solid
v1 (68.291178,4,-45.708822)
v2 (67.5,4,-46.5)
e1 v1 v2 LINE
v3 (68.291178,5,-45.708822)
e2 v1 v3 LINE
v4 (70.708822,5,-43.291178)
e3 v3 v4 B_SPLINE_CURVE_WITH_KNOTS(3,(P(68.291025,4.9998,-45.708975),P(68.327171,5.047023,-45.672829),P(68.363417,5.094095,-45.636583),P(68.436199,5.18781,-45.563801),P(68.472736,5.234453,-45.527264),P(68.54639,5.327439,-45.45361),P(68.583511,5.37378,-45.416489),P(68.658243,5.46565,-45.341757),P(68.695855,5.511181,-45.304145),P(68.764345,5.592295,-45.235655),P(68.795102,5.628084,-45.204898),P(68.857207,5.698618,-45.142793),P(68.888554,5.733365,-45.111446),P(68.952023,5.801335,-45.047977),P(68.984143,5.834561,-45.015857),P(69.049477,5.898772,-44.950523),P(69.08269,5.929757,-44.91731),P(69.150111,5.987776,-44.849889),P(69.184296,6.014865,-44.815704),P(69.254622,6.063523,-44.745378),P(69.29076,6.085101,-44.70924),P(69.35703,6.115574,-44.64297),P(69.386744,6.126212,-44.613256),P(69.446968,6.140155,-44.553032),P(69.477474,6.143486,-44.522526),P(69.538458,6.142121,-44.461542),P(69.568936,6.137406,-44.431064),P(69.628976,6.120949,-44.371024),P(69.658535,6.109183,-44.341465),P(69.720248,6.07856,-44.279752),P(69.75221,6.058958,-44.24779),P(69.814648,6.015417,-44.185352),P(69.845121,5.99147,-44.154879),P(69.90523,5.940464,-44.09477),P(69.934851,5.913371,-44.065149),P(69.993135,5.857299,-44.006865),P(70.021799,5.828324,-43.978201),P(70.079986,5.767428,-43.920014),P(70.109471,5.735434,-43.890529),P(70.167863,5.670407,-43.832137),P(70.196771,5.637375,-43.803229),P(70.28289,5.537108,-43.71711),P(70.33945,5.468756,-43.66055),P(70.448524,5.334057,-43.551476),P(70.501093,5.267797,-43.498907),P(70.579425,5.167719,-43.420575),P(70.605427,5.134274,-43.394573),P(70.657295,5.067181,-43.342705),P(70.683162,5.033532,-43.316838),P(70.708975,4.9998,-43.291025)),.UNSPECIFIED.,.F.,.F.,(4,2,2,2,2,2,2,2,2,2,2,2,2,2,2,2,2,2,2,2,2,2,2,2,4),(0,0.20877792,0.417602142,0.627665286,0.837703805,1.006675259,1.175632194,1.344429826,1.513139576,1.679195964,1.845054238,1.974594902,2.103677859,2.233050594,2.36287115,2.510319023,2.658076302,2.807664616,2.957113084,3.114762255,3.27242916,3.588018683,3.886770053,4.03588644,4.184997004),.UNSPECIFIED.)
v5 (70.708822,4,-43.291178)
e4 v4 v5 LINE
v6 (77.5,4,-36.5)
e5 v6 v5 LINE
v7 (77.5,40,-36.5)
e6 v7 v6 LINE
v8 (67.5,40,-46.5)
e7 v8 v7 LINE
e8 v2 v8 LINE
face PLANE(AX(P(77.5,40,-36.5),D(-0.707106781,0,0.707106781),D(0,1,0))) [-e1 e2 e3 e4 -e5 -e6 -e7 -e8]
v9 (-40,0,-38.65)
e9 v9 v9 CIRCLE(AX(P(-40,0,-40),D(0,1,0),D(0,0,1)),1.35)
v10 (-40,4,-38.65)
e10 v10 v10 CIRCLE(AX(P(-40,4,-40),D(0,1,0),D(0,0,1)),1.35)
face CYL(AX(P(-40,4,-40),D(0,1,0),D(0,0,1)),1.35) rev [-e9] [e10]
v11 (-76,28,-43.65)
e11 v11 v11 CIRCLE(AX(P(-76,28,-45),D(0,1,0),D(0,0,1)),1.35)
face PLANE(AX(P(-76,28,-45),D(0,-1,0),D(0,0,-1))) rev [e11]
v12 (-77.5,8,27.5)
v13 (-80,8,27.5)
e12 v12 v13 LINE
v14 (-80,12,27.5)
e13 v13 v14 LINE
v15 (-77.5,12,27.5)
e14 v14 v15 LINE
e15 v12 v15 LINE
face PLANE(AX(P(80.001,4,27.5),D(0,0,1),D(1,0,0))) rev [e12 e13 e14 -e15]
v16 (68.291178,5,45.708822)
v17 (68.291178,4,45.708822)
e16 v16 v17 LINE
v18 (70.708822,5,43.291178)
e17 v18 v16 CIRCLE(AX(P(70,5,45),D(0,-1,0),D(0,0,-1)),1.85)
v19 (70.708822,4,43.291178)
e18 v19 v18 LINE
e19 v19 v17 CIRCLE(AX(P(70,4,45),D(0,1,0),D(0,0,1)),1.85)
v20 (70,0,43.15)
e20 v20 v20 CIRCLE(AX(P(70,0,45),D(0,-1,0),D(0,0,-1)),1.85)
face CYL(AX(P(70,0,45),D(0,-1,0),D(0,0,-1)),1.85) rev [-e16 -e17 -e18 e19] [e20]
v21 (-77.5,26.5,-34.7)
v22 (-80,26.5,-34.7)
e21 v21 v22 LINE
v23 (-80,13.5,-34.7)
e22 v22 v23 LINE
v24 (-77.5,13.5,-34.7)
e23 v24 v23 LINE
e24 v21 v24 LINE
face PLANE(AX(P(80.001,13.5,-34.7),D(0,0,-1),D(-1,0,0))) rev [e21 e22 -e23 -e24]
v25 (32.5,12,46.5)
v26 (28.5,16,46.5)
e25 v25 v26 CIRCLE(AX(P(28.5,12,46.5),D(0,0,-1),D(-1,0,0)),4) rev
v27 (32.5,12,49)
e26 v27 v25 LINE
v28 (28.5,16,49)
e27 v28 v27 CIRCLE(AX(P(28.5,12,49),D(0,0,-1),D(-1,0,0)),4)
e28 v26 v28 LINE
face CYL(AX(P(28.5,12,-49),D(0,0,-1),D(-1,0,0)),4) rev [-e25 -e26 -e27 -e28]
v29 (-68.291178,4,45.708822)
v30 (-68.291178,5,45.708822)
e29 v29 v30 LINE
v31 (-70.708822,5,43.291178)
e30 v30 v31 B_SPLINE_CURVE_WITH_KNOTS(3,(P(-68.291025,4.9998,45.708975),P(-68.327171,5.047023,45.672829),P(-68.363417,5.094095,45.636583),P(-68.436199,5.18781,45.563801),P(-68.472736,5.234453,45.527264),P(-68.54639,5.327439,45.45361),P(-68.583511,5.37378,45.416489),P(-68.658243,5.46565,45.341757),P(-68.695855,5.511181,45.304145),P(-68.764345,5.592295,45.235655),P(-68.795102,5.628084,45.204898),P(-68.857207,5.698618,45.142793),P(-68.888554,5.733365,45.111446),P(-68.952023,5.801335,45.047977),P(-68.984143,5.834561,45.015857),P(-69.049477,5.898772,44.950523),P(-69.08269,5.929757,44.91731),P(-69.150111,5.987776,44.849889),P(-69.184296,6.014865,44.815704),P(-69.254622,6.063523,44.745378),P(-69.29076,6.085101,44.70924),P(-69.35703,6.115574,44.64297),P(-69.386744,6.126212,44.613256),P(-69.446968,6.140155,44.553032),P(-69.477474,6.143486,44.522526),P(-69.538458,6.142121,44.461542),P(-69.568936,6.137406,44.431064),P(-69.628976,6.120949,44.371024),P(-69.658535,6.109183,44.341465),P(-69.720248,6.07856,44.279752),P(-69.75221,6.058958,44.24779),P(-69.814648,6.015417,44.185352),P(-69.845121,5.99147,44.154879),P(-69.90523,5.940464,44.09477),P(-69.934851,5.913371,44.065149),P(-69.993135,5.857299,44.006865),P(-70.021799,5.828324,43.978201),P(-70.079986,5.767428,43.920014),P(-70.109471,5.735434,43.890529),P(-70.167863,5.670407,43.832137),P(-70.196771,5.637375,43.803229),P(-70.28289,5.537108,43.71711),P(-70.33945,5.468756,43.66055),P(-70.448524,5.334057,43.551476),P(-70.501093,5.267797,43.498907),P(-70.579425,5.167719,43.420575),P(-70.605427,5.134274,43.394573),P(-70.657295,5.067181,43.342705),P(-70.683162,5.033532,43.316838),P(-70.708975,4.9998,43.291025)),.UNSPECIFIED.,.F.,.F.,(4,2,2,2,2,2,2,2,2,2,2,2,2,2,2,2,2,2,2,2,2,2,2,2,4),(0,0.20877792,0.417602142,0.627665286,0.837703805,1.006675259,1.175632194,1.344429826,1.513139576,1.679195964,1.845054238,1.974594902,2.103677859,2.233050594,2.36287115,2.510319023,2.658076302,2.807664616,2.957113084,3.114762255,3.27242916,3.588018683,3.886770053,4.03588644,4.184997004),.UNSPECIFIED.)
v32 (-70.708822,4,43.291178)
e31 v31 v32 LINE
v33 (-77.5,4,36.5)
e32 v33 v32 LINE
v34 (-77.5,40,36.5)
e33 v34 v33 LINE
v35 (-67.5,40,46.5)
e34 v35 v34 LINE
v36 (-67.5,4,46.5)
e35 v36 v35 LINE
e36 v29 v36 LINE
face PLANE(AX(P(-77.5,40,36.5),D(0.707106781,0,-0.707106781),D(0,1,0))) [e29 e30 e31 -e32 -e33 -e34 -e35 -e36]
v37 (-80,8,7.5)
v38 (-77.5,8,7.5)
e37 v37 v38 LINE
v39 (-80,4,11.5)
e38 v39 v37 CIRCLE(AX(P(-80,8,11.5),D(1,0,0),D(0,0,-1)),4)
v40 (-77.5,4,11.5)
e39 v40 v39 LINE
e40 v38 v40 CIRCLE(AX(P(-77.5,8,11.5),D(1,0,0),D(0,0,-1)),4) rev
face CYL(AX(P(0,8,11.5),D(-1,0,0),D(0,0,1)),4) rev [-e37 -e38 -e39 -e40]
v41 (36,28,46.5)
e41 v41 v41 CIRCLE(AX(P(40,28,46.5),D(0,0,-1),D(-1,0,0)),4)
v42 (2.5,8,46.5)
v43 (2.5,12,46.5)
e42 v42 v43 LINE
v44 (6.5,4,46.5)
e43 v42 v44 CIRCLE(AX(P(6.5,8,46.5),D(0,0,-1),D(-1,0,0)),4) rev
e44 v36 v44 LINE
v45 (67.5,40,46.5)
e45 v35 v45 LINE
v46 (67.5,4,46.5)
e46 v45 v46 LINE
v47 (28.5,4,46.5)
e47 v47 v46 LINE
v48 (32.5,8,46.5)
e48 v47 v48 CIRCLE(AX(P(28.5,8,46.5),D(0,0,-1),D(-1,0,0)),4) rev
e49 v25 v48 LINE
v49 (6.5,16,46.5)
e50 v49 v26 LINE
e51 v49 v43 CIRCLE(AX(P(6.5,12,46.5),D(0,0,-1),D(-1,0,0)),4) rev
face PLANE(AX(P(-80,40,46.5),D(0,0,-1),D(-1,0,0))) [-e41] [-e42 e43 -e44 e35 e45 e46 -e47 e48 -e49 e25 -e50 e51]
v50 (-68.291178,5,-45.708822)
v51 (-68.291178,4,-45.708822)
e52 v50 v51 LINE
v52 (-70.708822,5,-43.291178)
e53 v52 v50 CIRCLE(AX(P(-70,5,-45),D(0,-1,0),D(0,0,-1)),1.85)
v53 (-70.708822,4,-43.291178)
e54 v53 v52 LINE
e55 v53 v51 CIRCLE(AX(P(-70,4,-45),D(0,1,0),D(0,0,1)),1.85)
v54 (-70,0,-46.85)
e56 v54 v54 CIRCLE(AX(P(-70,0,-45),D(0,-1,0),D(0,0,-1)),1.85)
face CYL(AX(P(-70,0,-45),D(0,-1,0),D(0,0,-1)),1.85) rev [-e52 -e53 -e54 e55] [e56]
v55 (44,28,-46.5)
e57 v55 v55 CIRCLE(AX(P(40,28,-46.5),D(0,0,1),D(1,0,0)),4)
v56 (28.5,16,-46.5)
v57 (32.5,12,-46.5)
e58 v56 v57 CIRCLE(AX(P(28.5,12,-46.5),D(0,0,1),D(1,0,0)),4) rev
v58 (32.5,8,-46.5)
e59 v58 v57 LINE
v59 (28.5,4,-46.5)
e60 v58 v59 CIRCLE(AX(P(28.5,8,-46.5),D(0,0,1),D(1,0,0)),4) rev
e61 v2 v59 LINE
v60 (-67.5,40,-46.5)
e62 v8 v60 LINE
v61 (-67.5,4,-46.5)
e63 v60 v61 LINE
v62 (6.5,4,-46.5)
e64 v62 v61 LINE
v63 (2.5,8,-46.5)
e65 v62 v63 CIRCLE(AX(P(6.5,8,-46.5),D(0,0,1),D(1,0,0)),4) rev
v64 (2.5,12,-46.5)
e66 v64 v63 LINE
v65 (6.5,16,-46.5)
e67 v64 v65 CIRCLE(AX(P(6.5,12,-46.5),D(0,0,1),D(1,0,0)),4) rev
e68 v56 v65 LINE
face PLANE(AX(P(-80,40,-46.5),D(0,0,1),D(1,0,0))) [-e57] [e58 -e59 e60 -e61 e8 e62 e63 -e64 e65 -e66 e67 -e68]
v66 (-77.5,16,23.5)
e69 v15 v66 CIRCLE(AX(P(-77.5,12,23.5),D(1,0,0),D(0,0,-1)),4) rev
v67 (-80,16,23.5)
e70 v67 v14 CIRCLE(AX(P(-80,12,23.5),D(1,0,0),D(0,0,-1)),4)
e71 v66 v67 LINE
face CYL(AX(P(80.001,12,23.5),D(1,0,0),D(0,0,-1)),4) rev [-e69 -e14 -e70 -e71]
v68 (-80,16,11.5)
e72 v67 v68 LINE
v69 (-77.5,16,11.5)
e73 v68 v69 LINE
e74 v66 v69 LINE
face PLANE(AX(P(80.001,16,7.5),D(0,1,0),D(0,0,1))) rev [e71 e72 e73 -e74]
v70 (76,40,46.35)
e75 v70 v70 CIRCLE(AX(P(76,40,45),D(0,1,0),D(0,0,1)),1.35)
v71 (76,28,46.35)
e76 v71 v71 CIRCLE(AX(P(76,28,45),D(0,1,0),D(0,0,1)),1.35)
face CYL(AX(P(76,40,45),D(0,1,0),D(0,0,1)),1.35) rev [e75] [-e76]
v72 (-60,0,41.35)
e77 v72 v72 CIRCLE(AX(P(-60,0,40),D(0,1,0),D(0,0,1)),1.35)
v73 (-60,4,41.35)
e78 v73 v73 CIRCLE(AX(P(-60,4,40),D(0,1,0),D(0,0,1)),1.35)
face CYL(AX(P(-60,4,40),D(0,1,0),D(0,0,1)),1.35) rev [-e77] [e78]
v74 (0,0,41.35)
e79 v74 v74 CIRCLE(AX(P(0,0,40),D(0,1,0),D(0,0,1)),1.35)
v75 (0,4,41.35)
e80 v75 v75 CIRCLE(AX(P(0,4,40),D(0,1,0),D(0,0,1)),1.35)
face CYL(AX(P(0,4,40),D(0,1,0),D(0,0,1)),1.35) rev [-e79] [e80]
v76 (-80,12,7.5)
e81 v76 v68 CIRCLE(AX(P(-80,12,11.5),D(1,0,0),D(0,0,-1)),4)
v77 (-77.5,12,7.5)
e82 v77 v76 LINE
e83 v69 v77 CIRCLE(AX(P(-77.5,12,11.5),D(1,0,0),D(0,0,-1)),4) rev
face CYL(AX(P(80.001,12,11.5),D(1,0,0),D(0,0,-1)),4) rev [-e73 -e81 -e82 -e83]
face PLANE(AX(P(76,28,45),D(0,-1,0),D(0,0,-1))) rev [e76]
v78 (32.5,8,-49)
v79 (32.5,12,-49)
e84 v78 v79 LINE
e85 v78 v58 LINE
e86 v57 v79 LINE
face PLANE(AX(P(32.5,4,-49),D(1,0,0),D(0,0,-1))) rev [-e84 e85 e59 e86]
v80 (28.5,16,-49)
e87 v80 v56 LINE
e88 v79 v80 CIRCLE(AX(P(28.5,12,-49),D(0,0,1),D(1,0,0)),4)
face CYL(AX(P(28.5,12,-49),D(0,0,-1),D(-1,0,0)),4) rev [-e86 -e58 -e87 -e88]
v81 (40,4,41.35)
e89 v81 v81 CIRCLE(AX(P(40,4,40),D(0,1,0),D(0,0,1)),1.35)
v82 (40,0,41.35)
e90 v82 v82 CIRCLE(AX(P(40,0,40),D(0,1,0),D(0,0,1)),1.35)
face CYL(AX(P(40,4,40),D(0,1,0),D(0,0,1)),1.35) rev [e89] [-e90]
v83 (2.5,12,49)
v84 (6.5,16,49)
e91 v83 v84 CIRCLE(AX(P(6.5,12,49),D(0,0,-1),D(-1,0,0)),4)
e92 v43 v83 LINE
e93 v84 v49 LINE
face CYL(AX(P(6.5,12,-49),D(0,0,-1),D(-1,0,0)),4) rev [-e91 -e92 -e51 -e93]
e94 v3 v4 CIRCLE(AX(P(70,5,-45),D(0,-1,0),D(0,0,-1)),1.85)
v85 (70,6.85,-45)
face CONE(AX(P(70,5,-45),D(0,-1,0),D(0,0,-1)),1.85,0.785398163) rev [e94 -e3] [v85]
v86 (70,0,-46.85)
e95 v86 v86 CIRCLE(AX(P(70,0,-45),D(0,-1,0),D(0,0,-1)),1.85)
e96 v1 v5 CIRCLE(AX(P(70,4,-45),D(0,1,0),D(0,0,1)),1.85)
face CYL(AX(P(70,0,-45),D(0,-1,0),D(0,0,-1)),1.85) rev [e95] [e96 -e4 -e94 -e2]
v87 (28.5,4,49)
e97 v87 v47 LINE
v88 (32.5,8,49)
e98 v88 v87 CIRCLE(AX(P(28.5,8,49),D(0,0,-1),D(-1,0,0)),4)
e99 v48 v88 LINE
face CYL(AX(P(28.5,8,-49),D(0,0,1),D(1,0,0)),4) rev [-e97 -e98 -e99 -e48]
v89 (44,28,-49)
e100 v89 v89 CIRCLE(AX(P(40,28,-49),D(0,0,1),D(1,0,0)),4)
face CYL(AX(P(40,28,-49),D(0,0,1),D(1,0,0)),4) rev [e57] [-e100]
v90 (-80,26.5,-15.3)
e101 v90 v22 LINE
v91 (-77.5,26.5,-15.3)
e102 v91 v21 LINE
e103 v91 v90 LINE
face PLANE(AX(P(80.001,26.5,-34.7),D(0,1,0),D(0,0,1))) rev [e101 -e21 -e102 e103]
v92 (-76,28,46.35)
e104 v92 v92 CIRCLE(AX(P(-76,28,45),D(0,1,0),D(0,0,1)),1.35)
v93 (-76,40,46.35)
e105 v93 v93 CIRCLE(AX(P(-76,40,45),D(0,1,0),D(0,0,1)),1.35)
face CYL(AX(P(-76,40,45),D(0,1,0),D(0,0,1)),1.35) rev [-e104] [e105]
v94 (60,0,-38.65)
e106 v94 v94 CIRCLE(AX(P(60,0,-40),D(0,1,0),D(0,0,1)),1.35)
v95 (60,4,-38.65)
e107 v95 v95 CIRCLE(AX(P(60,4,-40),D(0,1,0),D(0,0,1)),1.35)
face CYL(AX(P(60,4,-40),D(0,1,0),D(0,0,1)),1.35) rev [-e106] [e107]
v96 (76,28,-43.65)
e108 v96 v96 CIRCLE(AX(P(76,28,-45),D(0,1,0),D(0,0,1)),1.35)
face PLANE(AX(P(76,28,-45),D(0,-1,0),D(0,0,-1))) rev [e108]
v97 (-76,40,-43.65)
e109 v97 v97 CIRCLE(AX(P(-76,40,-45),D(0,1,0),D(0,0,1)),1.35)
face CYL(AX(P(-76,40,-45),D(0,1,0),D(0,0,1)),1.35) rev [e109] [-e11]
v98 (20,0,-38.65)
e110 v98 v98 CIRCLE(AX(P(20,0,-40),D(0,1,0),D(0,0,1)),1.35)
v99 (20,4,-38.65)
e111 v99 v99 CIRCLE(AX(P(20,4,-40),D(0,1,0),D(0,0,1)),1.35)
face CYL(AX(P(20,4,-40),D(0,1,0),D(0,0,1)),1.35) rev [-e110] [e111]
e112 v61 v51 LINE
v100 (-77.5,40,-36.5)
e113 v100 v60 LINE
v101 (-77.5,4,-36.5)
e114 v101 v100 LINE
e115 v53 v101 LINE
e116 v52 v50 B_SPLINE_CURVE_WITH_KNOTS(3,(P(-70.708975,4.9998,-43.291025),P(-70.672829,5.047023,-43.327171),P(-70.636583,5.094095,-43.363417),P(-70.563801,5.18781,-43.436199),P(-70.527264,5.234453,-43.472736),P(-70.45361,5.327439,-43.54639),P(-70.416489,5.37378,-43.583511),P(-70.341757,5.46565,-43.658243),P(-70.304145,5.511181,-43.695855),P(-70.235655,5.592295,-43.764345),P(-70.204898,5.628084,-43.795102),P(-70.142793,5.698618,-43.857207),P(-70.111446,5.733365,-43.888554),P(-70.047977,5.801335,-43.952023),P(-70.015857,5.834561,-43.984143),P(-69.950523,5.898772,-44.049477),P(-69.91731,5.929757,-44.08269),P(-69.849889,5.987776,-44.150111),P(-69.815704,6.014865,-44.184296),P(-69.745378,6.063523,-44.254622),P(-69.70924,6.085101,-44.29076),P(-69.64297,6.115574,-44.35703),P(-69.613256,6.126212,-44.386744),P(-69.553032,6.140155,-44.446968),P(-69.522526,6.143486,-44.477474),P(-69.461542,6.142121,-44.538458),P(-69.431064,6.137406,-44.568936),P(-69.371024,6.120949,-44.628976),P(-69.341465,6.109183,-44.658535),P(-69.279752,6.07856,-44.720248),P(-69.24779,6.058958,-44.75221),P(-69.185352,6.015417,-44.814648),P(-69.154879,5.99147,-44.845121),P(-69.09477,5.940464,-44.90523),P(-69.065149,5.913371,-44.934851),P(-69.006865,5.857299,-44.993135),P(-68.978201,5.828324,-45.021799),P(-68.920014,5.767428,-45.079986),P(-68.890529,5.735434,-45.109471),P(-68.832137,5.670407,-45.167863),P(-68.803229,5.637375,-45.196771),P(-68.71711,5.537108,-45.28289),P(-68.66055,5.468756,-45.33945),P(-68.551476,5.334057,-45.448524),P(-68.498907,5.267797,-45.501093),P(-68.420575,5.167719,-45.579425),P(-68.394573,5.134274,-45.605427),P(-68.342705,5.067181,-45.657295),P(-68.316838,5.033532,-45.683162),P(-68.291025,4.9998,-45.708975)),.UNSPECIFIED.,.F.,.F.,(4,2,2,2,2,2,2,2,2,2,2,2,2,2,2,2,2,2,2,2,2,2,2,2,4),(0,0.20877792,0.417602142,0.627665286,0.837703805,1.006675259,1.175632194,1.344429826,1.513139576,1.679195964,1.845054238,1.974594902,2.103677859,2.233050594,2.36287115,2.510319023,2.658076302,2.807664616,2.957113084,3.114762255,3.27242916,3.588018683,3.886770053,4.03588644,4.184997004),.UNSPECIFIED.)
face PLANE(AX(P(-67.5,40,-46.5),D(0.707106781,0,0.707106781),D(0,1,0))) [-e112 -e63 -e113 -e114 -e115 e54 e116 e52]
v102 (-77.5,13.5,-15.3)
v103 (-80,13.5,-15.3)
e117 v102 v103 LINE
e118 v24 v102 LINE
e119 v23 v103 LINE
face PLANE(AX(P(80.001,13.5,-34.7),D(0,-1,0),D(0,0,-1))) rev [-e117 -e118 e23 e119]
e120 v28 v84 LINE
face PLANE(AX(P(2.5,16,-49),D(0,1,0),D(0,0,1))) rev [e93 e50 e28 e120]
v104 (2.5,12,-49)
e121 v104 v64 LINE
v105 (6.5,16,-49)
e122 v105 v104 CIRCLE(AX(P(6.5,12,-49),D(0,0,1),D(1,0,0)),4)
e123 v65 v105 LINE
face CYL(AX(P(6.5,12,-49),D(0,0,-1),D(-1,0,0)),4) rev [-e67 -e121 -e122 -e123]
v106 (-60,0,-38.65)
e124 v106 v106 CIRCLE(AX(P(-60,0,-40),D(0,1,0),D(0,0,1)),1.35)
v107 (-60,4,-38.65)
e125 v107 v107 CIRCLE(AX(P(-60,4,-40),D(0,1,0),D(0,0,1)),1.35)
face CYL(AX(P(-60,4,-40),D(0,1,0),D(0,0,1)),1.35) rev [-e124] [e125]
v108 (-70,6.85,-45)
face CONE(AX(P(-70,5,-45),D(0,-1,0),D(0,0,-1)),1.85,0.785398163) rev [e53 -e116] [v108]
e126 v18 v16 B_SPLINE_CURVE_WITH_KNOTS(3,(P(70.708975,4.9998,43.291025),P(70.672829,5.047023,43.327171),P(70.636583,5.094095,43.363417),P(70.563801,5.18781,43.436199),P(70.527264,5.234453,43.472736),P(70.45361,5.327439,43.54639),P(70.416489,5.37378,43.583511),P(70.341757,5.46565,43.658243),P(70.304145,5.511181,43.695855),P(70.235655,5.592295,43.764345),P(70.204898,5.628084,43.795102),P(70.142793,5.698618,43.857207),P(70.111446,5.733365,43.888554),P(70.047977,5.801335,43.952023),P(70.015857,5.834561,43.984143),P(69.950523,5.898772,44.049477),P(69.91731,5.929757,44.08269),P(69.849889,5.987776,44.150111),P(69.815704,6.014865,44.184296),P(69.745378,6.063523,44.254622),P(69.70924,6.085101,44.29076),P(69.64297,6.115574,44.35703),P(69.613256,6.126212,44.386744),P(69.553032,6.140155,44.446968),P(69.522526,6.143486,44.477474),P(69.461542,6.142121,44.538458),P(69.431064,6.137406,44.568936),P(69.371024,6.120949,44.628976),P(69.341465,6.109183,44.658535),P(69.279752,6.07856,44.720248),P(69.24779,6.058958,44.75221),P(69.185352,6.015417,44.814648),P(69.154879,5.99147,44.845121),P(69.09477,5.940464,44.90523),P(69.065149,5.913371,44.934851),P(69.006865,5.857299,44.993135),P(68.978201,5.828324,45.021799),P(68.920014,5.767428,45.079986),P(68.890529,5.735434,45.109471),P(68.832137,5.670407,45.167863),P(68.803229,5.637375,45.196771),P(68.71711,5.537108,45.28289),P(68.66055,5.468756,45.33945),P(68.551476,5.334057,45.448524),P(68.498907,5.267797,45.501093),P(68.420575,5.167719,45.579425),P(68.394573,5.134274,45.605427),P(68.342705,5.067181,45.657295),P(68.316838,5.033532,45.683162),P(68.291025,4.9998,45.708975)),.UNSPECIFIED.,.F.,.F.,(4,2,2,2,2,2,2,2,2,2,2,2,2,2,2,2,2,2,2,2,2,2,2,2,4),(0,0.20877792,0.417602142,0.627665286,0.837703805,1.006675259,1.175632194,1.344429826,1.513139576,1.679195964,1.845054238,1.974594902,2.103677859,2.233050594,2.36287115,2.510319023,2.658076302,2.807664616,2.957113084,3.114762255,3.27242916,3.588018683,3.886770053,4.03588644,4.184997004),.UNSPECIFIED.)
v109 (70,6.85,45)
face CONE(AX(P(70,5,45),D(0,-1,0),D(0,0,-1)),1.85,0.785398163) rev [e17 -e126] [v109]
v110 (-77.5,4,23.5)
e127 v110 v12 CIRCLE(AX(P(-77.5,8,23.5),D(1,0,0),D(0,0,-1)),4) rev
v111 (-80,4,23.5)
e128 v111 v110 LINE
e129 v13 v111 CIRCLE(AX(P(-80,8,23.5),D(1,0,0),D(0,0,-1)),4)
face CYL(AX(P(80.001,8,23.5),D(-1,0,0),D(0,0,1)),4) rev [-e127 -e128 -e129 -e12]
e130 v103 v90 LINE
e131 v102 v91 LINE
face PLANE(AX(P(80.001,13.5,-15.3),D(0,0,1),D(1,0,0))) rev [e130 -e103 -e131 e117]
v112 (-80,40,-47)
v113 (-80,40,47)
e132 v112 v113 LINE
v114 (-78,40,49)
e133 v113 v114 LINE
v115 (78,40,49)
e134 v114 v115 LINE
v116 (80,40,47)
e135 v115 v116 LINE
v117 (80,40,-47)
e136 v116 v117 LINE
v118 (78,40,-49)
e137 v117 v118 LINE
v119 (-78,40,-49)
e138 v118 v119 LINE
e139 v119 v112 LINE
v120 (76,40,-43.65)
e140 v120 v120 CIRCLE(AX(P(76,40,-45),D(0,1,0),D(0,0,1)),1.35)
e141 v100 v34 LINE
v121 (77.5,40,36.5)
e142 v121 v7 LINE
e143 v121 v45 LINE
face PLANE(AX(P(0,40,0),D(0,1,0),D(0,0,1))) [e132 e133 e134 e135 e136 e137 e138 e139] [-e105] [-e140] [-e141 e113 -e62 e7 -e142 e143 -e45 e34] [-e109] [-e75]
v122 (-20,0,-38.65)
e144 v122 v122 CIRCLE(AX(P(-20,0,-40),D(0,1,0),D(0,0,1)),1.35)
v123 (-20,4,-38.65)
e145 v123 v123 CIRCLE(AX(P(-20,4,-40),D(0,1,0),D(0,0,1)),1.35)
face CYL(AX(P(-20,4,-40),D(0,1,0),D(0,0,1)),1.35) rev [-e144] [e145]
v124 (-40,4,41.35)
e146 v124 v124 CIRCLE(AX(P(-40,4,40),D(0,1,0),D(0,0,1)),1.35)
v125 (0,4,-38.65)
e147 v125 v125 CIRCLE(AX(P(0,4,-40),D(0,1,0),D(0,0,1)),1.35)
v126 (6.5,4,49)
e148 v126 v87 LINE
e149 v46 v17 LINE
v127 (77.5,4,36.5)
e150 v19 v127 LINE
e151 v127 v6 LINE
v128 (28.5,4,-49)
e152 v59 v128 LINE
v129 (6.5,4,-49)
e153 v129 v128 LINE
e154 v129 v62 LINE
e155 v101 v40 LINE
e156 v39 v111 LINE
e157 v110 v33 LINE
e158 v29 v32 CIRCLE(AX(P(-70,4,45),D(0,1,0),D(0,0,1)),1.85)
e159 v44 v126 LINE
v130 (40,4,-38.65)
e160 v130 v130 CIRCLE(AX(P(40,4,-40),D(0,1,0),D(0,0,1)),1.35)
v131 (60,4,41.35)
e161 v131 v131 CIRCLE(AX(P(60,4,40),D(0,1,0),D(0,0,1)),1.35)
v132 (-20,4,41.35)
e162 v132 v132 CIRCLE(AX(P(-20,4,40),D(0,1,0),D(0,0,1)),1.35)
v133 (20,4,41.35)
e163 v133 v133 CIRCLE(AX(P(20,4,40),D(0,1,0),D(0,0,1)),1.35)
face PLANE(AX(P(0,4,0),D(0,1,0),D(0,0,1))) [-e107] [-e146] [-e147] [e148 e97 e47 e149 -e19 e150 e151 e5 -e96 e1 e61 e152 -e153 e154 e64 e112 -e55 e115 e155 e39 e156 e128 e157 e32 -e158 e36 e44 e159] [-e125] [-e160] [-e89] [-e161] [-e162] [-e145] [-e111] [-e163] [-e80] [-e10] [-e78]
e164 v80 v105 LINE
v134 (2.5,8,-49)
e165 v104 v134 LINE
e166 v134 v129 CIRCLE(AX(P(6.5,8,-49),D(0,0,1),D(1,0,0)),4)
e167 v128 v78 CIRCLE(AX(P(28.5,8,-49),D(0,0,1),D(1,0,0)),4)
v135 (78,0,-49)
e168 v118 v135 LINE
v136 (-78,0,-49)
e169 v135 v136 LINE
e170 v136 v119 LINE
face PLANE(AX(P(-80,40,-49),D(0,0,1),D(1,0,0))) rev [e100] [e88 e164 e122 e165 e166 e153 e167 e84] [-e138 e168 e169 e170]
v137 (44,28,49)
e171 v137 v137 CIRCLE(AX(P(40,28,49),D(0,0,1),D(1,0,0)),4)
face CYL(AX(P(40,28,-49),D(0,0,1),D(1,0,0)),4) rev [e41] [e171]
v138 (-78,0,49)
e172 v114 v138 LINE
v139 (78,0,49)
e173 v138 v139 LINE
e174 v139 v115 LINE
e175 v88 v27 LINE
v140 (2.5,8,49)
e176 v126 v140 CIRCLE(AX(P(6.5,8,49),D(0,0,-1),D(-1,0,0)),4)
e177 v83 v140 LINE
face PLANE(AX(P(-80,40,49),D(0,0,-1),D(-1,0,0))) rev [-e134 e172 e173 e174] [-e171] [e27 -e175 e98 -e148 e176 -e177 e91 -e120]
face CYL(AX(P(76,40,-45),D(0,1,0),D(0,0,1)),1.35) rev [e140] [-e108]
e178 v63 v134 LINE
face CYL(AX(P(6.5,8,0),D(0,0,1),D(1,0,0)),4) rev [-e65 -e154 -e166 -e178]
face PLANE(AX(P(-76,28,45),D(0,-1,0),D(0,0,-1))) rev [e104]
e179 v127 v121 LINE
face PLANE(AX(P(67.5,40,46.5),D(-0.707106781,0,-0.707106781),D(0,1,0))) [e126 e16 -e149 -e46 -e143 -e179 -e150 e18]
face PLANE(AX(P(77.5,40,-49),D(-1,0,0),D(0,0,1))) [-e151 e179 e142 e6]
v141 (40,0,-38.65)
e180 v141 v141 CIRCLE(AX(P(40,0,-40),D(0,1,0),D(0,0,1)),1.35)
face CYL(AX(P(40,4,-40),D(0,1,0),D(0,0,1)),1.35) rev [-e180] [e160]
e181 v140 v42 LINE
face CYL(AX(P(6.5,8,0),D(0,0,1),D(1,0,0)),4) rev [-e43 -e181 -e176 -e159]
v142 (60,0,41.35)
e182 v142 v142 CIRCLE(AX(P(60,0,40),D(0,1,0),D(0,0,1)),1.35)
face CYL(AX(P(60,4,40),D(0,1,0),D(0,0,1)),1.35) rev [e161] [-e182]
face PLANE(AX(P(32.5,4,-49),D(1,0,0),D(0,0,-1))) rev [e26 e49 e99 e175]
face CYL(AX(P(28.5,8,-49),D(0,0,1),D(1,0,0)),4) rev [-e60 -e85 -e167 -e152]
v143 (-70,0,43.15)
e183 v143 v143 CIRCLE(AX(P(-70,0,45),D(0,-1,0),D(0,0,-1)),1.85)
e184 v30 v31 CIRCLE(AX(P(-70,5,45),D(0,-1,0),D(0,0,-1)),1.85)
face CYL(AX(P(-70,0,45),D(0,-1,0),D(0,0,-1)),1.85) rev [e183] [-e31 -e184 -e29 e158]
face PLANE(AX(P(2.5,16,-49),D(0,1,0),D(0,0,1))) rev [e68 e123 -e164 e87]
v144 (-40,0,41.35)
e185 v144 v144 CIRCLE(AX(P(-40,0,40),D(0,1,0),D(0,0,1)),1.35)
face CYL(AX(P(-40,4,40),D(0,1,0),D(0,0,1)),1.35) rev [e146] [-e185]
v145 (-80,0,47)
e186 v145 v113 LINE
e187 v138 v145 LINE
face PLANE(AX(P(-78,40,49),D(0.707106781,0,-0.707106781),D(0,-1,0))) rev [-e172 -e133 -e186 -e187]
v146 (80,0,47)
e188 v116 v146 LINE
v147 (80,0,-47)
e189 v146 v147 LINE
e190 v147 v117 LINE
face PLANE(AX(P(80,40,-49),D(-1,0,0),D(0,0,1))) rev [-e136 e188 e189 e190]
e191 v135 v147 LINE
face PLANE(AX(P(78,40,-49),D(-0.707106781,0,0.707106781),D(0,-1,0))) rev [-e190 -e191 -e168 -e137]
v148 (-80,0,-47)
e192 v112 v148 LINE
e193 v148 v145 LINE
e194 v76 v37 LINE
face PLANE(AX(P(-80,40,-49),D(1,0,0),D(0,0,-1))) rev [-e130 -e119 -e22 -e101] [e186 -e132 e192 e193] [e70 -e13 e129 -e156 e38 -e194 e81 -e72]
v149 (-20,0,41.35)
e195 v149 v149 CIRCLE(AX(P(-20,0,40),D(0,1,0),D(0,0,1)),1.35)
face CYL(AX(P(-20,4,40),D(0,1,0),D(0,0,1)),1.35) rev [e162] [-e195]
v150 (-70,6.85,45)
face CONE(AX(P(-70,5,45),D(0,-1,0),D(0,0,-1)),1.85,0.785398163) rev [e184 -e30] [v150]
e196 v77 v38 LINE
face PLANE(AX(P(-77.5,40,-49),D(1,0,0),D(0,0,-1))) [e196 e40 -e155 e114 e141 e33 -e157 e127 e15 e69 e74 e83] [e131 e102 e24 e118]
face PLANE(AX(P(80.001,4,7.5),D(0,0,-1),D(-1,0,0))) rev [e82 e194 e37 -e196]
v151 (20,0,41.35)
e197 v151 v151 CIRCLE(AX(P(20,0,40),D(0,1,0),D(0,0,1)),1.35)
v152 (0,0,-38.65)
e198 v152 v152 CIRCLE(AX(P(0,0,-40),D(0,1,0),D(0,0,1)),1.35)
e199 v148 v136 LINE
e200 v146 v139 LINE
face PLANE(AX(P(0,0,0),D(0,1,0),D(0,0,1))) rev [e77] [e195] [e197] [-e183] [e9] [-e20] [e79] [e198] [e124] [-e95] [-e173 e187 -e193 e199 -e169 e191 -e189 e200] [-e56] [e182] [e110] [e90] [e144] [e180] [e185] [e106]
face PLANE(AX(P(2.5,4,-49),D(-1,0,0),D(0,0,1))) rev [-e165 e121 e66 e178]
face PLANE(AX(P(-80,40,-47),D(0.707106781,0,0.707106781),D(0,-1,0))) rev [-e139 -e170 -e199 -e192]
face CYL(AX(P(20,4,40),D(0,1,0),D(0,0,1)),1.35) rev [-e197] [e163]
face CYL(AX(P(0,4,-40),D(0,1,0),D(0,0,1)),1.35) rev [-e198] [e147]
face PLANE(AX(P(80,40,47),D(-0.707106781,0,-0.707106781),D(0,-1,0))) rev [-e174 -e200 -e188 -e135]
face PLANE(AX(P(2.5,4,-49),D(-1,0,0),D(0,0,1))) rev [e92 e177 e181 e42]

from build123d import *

# Parameters (mm, degrees)
SKETCH1_W                 = 160
SKETCH1_H                 = 98
BOSS_EXTRUDE1_DEPTH       = 40
SHELL1_T                  = -2.5
SHELL1_THICKNESS_2_FACE_W = 93
SHELL1_THICKNESS_2_FACE_H = 155
SHELL1_THICKNESS_2_DEPTH  = 1.5
CHAMFER1_SIZE             = 2
CHAMFER2_SIZE             = 10
HOLE2_START               = 28
HOLE2_OUTLINE_R           = 1.35
HOLE2_DEPTH               = 12
HOLE3_D                   = 2.7
MIRROR2_COPY_1_D          = 2.7
CUT_EXTRUDE2_REACH        = 174.049
SKETCH15_W                = 19.4
SKETCH15_H                = 13
CUT_EXTRUDE3_REACH        = 174.049
SKETCH16_W                = 20
SKETCH16_H                = 12
FILLET4_R                 = 4
SKETCH17_R                = 4
CUT_EXTRUDE4_DEPTH        = 133.680066325
SKETCH20_W                = 30
SKETCH20_H                = 12
CUT_EXTRUDE5_DEPTH        = 157.939807062
FILLET6_R                 = 4


# Read off the part's stored shape, not the designer's step: Hole1, Hole2
with BuildPart() as part:
    # Sketch1 → Boss-Extrude1 (new body)
    with BuildSketch(Plane(origin=(0, 0, 0), x_dir=(1, 0, 0), z_dir=(0, 1, 0))):
        Rectangle(SKETCH1_W, SKETCH1_H)
    extrude(amount=BOSS_EXTRUDE1_DEPTH)

    # Shell1
    shell1_openings = [part.faces().sort_by_distance(p)[0] for p in [
        (0, 40, 0),
    ]]
    offset(amount=SHELL1_T, openings=shell1_openings, kind=Kind.INTERSECTION)

    # Shell1 thickness 2 face (on inner face of the shell) → Shell1 thickness 2 (add)
    with BuildSketch(Plane(origin=(0, 2.5, 0), x_dir=(0, 0, -1), z_dir=(0, -1, 0))):
        Rectangle(SHELL1_THICKNESS_2_FACE_W, SHELL1_THICKNESS_2_FACE_H)
    extrude(amount=-SHELL1_THICKNESS_2_DEPTH)

    # Chamfer1
    chamfer1_edges = [part.edges().sort_by_distance(p)[0] for p in [
        (80, 20, 49),
        (-80, 20, 49),
        (-80, 20, -49),
        (80, 20, -49),
    ]]
    chamfer(chamfer1_edges, length=CHAMFER1_SIZE)

    # Chamfer2
    chamfer2_edges = [part.edges().sort_by_distance(p)[0] for p in [
        (77.5, 22, 46.5),
        (77.5, 22, -46.5),
        (-77.5, 22, -46.5),
        (-77.5, 22, 46.5),
    ]]
    chamfer(chamfer2_edges, length=CHAMFER2_SIZE)

    # Hole1 outline → Hole1 (revolve, cut)
    with BuildSketch(Plane(origin=(-70, 0, 45), x_dir=(1, 0, 0), z_dir=(0, 0, 1))):
        Polygon((1.85, 0), (1.85, 5), (0, 6.85), (0, 0), align=None)
    revolve(axis=Axis((-70, 0, 45), (0, 1, 0)), mode=Mode.SUBTRACT)

    # Hole1 2 outline → Hole1 2 (revolve, cut)
    with BuildSketch(Plane(origin=(70, 0, -45), x_dir=(1, 0, 0), z_dir=(0, 0, 1))):
        Polygon((1.85, 0), (1.85, 5), (0, 6.85), (0, 0), align=None)
    revolve(axis=Axis((70, 0, -45), (0, 1, 0)), mode=Mode.SUBTRACT)

    # Hole1 3 outline → Hole1 3 (revolve, cut)
    with BuildSketch(Plane(origin=(70, 0, 45), x_dir=(1, 0, 0), z_dir=(0, 0, 1))):
        Polygon((1.85, 0), (1.85, 5), (0, 6.85), (0, 0), align=None)
    revolve(axis=Axis((70, 0, 45), (0, 1, 0)), mode=Mode.SUBTRACT)

    # Hole1 4 outline → Hole1 4 (revolve, cut)
    with BuildSketch(Plane(origin=(-70, 0, -45), x_dir=(1, 0, 0), z_dir=(0, 0, 1))):
        Polygon((1.85, 0), (1.85, 5), (0, 6.85), (0, 0), align=None)
    revolve(axis=Axis((-70, 0, -45), (0, 1, 0)), mode=Mode.SUBTRACT)

    # Hole2 outline → Hole2 (cut)
    with BuildSketch(Plane(origin=(0, 0, 0), x_dir=(1, 0, 0), z_dir=(0, 1, 0)).offset(HOLE2_START)):
        with Locations((76, -45)):
            Circle(HOLE2_OUTLINE_R)
        with Locations((-76, 45)):
            Circle(HOLE2_OUTLINE_R)
        with Locations((-76, -45)):
            Circle(HOLE2_OUTLINE_R)
        with Locations((76, 45)):
            Circle(HOLE2_OUTLINE_R)
    extrude(amount=HOLE2_DEPTH, mode=Mode.SUBTRACT)

    # Hole3 (through all)
    with Locations(Plane(origin=(0, 4, 0), x_dir=(1, 0, 0), z_dir=(0, 1, 0))):
        with Locations((60, -40), (0, -40), (20, -40), (40, -40)):
            hole3 = Hole(HOLE3_D / 2)

    # Mirror1: Hole3 across plane
    add(hole3.mirror(Plane(origin=(0, 0, 0), x_dir=(0, 0, 1), z_dir=(1, 0, 0))), mode=Mode.SUBTRACT)

    # Mirror2: Hole3 across plane
    add(hole3.mirror(Plane.XY), mode=Mode.SUBTRACT)

    # Mirror2 copy 1 (through all)
    with Locations(Plane(origin=(0, 4, 0), x_dir=(-1, 0, 0), z_dir=(0, 1, 0))):
        with Locations((60, -40), (0, -40), (20, -40), (40, -40)):
            Hole(MIRROR2_COPY_1_D / 2)

    # Sketch15 → Cut-Extrude2 (cut, up to next)
    with BuildSketch(Plane.ZY.offset(80), mode=Mode.PRIVATE) as cut_extrude2_sk1:
        with Locations((-25, 20)):
            Rectangle(SKETCH15_W, SKETCH15_H)
    cut_extrude2_tool1 = extrude(cut_extrude2_sk1.sketch, amount=-CUT_EXTRUDE2_REACH, mode=Mode.PRIVATE) & part.part
    add(cut_extrude2_tool1.solids().sort_by_distance((-80, 20, -25))[0], mode=Mode.SUBTRACT)

    # Sketch16 → Cut-Extrude3 (cut, up to next)
    with BuildSketch(Plane.ZY.offset(80), mode=Mode.PRIVATE) as cut_extrude3_sk1:
        with Locations((17.5, 10)):
            Rectangle(SKETCH16_W, SKETCH16_H)
    cut_extrude3_tool1 = extrude(cut_extrude3_sk1.sketch, amount=-CUT_EXTRUDE3_REACH, mode=Mode.PRIVATE) & part.part
    add(cut_extrude3_tool1.solids().sort_by_distance((-80, 10, 17.5))[0], mode=Mode.SUBTRACT)

    # Fillet4
    fillet4_edges = [part.edges().sort_by_distance(p)[0] for p in [
        (-78.75, 16, 7.5),
        (-78.75, 4, 7.5),
        (-78.75, 4, 27.5),
        (-78.75, 16, 27.5),
    ]]
    fillet(fillet4_edges, radius=FILLET4_R)

    # Sketch17 → Cut-Extrude4 (cut, through all)
    with BuildSketch(Plane.XY.offset(49)):
        with Locations((40, 28)):
            Circle(SKETCH17_R)
    extrude(amount=-CUT_EXTRUDE4_DEPTH, mode=Mode.SUBTRACT)

    # Sketch20 → Cut-Extrude5 (cut, through all)
    with BuildSketch(Plane(origin=(35.971952471, 0.293460479, 49), x_dir=(1, 0, 0), z_dir=(0, 0, 1))):
        with Locations((-18.471952471, 9.706539521)):
            Rectangle(SKETCH20_W, SKETCH20_H)
    extrude(amount=-CUT_EXTRUDE5_DEPTH, mode=Mode.SUBTRACT)

    # Fillet6
    fillet6_edges = [part.edges().sort_by_distance(p)[0] for p in [
        (2.5, 16, -47.75),
        (32.5, 16, -47.75),
        (2.5, 4, -47.75),
        (32.5, 4, -47.75),
        (32.5, 4, 47.75),
        (32.5, 16, 47.75),
        (2.5, 4, 47.75),
        (2.5, 16, 47.75),
    ]]
    fillet(fillet6_edges, radius=FILLET6_R)


solid = part.part
